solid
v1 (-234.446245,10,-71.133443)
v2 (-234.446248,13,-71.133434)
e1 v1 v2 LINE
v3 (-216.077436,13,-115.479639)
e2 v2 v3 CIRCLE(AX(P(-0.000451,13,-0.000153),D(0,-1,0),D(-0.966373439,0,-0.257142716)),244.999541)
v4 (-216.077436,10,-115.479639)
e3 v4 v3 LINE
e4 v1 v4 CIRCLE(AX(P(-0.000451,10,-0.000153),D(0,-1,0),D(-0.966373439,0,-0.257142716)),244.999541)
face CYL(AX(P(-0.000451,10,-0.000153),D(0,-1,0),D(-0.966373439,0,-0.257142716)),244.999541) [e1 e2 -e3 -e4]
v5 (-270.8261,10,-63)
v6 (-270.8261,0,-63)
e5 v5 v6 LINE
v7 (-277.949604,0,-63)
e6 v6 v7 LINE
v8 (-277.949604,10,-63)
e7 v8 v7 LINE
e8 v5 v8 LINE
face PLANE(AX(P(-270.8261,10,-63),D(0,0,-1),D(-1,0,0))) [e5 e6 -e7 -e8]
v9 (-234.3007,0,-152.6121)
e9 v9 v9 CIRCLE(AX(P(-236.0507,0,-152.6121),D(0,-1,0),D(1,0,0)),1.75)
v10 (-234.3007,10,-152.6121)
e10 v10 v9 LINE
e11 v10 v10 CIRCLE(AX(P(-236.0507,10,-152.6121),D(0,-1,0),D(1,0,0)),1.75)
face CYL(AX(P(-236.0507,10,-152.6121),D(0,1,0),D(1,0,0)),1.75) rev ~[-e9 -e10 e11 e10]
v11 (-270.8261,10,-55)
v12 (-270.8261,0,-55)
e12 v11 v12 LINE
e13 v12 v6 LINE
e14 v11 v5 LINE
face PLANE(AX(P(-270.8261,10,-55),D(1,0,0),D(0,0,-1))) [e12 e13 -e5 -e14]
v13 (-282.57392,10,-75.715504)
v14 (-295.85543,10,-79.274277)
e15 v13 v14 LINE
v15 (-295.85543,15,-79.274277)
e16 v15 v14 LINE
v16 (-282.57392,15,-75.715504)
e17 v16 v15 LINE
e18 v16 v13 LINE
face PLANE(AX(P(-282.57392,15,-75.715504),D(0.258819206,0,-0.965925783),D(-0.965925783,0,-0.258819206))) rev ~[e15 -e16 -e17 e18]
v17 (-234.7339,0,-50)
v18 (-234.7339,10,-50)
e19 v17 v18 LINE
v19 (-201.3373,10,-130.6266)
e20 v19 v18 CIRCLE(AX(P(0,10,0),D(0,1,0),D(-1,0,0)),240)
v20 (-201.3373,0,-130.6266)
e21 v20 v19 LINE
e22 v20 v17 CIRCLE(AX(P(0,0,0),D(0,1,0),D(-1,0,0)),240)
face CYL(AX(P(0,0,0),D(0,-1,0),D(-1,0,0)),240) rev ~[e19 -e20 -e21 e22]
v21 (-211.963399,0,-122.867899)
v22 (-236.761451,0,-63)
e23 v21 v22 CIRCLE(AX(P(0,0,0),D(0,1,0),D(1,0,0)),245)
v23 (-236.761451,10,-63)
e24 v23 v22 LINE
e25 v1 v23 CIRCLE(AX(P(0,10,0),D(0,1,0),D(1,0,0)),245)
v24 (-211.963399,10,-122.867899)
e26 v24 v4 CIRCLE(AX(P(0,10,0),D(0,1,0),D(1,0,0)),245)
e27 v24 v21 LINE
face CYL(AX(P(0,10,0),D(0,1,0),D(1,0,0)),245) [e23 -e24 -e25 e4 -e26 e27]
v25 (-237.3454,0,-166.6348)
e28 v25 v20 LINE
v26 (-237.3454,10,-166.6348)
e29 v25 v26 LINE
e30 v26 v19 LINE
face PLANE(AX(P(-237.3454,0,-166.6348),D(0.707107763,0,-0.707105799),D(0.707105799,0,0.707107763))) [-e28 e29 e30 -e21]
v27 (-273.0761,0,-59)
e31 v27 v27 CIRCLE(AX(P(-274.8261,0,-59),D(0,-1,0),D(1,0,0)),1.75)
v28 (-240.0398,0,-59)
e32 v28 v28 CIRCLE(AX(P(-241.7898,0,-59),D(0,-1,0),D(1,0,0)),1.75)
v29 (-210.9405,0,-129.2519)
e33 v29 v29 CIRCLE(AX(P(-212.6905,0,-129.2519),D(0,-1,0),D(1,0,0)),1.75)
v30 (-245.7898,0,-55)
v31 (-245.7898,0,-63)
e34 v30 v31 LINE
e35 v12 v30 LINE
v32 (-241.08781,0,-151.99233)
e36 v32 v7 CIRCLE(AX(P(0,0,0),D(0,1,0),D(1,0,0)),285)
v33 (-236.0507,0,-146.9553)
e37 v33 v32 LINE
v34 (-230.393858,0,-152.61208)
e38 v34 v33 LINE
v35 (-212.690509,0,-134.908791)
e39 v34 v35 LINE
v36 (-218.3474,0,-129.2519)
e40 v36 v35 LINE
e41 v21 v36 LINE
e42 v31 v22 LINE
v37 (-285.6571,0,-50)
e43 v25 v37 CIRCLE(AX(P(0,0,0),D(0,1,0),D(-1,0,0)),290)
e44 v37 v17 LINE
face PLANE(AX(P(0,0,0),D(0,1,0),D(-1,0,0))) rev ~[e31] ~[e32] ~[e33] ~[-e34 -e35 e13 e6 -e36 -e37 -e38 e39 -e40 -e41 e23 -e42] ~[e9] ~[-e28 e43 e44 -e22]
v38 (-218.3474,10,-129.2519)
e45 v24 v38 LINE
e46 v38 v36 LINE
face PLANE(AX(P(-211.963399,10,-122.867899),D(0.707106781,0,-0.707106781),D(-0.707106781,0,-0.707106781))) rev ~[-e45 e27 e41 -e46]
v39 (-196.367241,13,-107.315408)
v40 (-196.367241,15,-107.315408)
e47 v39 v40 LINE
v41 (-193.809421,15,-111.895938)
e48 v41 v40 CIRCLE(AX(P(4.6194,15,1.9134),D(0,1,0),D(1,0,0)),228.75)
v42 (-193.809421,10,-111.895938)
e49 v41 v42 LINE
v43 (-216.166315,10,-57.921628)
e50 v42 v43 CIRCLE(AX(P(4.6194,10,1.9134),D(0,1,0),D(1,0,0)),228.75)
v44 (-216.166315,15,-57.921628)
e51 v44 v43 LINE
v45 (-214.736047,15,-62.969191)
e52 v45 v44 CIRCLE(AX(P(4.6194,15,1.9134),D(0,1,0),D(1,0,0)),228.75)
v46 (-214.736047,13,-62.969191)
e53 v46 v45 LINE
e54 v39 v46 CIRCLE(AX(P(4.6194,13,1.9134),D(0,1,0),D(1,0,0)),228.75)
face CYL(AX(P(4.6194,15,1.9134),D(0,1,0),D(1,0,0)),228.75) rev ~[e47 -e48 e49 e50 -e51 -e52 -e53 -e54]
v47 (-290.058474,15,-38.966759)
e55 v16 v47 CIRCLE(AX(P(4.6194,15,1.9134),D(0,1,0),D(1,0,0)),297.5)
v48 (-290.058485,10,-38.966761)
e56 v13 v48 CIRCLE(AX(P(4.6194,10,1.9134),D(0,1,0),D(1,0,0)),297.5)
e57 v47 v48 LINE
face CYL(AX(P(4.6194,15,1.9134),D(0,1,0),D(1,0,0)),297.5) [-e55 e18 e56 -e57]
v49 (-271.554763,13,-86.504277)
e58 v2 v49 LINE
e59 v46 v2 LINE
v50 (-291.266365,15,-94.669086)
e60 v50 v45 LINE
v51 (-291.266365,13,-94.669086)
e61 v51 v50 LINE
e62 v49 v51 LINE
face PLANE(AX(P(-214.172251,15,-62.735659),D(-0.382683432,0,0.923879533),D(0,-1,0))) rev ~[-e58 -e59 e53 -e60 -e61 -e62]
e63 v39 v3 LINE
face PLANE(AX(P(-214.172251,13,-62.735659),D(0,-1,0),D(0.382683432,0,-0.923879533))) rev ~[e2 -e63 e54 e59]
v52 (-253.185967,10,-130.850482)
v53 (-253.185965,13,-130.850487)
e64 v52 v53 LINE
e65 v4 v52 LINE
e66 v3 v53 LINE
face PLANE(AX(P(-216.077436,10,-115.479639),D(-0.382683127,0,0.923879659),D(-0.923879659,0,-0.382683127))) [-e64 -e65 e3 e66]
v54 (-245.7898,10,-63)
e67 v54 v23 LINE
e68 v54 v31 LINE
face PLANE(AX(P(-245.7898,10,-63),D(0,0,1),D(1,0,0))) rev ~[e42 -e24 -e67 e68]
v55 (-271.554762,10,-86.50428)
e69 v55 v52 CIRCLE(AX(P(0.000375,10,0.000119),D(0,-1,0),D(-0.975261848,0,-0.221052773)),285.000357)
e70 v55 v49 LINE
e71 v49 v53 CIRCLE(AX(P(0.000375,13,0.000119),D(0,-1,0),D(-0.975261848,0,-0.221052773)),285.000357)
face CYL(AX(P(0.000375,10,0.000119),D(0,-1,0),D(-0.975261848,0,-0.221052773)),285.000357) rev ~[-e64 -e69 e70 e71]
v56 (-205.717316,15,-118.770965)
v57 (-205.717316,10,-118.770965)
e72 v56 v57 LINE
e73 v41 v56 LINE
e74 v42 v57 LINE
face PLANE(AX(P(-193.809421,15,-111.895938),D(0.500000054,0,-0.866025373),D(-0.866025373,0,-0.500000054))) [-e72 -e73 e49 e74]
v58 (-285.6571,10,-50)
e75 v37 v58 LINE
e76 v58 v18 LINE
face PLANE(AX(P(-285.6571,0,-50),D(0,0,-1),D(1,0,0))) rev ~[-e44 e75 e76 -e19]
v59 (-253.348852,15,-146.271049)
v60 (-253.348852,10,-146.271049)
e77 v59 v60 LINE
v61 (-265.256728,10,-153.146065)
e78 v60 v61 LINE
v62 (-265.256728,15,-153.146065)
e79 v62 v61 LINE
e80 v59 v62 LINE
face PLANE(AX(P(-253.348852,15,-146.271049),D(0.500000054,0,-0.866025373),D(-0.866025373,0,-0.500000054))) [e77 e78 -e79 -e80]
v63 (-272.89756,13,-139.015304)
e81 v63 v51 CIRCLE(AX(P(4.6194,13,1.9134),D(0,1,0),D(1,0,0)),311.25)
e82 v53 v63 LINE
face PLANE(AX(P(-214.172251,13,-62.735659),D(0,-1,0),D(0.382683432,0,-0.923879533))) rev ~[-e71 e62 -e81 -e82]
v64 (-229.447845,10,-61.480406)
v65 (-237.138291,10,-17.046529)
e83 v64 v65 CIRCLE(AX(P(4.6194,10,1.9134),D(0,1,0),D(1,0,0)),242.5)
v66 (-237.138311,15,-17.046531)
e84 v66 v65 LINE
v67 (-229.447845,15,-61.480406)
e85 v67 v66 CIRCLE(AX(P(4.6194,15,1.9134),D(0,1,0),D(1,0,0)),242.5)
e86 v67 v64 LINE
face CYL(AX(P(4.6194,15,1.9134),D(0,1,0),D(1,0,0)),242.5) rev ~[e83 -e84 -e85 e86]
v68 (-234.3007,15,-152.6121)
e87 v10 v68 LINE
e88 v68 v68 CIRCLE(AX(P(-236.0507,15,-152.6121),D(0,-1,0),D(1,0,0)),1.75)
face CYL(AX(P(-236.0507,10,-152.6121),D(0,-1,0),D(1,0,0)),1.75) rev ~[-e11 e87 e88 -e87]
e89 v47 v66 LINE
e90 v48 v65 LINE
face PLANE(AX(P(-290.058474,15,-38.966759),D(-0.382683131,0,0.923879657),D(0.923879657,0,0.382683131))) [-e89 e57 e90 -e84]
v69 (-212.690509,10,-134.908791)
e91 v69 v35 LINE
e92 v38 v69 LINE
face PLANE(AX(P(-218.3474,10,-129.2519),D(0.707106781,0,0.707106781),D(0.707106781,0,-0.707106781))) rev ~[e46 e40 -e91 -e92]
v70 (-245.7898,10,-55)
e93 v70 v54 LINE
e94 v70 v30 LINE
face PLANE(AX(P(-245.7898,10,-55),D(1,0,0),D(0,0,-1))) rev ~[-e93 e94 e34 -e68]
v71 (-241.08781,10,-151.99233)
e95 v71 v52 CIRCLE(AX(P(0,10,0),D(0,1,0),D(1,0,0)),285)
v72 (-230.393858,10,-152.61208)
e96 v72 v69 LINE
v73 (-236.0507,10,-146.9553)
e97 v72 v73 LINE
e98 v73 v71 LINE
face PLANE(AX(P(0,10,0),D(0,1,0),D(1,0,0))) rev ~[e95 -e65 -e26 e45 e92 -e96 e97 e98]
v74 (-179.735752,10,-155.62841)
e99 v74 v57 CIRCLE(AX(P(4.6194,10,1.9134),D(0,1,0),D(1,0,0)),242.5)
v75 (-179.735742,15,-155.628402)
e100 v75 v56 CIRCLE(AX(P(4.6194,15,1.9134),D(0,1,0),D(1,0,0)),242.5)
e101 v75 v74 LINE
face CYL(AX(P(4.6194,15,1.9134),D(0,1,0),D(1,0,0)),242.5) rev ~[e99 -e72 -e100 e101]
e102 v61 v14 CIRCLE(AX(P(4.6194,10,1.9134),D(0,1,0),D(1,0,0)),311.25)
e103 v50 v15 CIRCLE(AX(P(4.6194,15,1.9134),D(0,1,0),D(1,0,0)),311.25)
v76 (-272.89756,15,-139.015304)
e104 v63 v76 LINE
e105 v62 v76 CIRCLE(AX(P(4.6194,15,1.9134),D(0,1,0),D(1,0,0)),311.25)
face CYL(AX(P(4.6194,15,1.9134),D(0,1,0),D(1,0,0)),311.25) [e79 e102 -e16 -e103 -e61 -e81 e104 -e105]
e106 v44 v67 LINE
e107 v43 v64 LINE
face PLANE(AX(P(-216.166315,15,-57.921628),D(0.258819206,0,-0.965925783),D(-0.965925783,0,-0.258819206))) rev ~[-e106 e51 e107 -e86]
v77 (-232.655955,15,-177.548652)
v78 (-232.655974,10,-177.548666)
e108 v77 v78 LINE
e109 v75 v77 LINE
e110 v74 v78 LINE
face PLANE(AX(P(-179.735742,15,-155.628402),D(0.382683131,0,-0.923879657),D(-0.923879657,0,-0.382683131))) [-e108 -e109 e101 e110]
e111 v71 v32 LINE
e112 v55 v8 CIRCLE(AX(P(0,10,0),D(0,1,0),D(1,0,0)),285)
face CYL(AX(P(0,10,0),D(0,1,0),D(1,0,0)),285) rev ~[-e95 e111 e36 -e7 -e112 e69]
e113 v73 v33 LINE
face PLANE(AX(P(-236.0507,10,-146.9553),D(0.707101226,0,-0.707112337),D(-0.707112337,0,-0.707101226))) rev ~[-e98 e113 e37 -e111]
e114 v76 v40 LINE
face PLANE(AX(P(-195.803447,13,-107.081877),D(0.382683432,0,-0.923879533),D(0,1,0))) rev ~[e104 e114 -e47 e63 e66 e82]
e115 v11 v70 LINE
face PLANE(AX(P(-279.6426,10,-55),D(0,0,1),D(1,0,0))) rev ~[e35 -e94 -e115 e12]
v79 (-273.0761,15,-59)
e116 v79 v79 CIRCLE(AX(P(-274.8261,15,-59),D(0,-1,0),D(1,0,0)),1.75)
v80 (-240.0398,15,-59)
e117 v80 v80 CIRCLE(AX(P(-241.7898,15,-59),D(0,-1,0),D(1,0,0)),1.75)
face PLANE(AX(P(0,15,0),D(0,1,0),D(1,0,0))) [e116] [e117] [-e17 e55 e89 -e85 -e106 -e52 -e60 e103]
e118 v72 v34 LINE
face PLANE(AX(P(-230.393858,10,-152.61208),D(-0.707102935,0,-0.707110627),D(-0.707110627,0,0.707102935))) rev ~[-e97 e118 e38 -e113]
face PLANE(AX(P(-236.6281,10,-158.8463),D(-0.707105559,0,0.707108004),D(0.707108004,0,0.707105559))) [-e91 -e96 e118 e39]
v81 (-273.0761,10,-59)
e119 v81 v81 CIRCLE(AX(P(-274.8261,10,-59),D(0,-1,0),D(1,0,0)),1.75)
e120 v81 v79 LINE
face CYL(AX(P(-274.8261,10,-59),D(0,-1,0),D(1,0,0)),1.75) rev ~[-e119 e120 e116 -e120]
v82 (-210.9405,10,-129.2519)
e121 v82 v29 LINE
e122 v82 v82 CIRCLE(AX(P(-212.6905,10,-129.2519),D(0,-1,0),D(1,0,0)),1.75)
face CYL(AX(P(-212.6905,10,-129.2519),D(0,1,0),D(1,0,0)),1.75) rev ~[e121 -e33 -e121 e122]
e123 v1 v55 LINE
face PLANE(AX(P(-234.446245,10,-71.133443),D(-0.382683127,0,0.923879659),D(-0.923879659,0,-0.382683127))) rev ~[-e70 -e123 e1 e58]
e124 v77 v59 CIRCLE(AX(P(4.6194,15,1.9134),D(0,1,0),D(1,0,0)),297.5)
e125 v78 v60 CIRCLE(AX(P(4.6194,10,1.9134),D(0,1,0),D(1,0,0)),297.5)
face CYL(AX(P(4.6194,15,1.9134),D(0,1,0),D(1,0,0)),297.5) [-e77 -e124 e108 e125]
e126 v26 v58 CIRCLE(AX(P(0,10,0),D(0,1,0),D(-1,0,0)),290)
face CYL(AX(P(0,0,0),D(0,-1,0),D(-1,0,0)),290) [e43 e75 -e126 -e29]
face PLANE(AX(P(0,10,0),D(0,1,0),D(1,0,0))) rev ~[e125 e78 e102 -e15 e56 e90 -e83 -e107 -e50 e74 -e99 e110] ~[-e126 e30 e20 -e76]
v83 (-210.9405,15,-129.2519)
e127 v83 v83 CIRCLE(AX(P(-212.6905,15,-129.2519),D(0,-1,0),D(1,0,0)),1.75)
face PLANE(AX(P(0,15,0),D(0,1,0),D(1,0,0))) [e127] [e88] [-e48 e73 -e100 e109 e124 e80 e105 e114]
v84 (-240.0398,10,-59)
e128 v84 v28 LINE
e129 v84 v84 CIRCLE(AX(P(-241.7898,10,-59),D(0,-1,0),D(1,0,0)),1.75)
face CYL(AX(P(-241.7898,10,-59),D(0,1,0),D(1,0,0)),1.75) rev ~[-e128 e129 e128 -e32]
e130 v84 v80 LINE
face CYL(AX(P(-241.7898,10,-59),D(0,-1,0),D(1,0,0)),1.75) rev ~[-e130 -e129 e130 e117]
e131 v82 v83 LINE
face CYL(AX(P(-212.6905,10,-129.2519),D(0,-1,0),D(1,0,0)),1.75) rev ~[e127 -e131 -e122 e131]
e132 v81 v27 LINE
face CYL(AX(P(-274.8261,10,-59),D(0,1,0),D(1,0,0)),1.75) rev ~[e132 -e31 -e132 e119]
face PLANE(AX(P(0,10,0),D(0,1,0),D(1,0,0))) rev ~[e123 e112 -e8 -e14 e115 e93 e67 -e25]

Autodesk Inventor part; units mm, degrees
ref_plane "YZ Plane" through (0, 0, 0) normal (1, 0, 0) x (0, 1, 0)
sketch "Sketch1" plane through (0, 0, 0) normal (0, 1, 0) x (-1, 0, 0)
  circle A0 centre (0, 0) radius 217.5
  circle A1 centre (0, 0) radius 312.5
  line L0 (0, 0) -> (220.9709, -220.9709)
  line L1 (0, 0) -> (312.5, 0) construction
  line L2 (312.1398, -15) -> (216.9821, -15)
  line L3 (231.3228, -210.1096) -> (164.0361, -142.8229)
  circle A2 centre (0, 0) radius 240
  circle A3 centre (0, 0) radius 290
  line L4 (285.6571, -50) -> (234.7339, -50)
  line L5 (237.3454, -166.6348) -> (201.3373, -130.6266)
  dimension "d0" = 435
  dimension "d1" = 625
  dimension "d2" = 45
  dimension "d3" = 15
  dimension "d4" = 15
  dimension "d5" = 22.5
  dimension "d6" = 22.5
  dimension "d7" = 35
  dimension "d8" = 35
extrude "Extrusion1" add sketch "Sketch1" along normal blind 10 contours A2 L4 A3 L5
sketch "Sketch2" plane through (0, 10, 0) normal (0, 1, 0) x (1, 0, 0)
  arc A0 (-237.3454, 166.6348) -> (-285.6571, 50) centre (0, 0) ccw projected
  line L0 (-285.6571, 50) -> (-234.7339, 50) projected
  arc A1 (-201.3373, 130.6266) -> (-234.7339, 50) centre (0, 0) ccw projected
  line L1 (-201.3373, 130.6266) -> (-237.3454, 166.6348) projected
  circle A2 centre (0, 0) radius 245
  circle A3 centre (0, 0) radius 285
  line L2 (-279.6426, 55) -> (-238.7467, 55)
  line L3 (-236.6281, 158.8463) -> (-207.7103, 129.9286)
  line L4 (-239.8437, 50) -> (-280.5798, 50)
  line L5 (-204.9504, 134.2398) -> (-233.7552, 163.0445)
  dimension "d11" = 5
  dimension "d12" = 5
  dimension "d13" = 5
  dimension "d14" = 5
extrude "Extrusion2" cut sketch "Sketch2" against normal up to surface (10 mm away) contours L3 A2 L2 A3
sketch "Sketch3" plane through (0, 10, 0) normal (0, 1, 0) x (1, 0, 0)
  arc A0 (-236.6281, 158.8463) -> (-279.6426, 55) centre (0, 0) ccw projected
  line L0 (-236.6281, 158.8463) -> (-207.7103, 129.9286) projected
  arc A1 (-207.7103, 129.9286) -> (-238.7467, 55) centre (0, 0) ccw projected
  line L1 (-238.7467, 55) -> (-279.6426, 55) projected
  arc A2 (-237.3454, 166.6348) -> (-285.6571, 50) centre (0, 0) ccw projected
  line L2 (-285.6571, 50) -> (-234.7339, 50) projected
  arc A3 (-201.3373, 130.6266) -> (-234.7339, 50) centre (0, 0) ccw projected
  line L3 (-201.3373, 130.6266) -> (-237.3454, 166.6348) projected
  circle A4 centre (0, 0) radius 217.5
  circle A5 centre (0, 0) radius 312.5
  line L4 (0, 0) -> (100, 0) construction
  line L5 (0, 0) -> (-220.9709, 220.9709)
  line L6 (0, 0) -> (312.5, 0) construction
  line L7 (-312.1398, 15) -> (-216.9821, 15)
  line L8 (-164.0361, 142.8229) -> (-231.3228, 210.1096)
  line L9 (-437.5, 0) -> (437.5, 0) projected
  dimension "d17" = 435
  dimension "d18" = 625
  dimension "d21" = 135
  dimension "d22" = 15
  dimension "d23" = 15
extrude "Extrusion3" add sketch "Sketch3" along normal blind 5 contours L0 A1 L1 A0 | L3 A3 L2 A2 | A4 L7 A5 L8
sketch "Sketch4" plane through (0, 15, 0) normal (0, 1, 0) x (1, 0, 0)
  arc A0 (-231.3228, 210.1096) -> (-312.1398, 15) centre (0, 0) ccw projected
  line L0 (-312.1398, 15) -> (-216.9821, 15) projected
  arc A1 (-164.0361, 142.8229) -> (-216.9821, 15) centre (0, 0) ccw projected
  line L1 (-164.0361, 142.8229) -> (-231.3228, 210.1096) projected
  circle A2 centre (0, 0) radius 217.5
  circle A3 centre (0, 0) radius 312.5
  line L2 (0, 0) -> (4.6194, -1.9134) construction
  line L3 (0, 0) -> (5, 0) construction
  circle A4 centre (4.6194, -1.9134) radius 242.5
  circle A5 centre (4.6194, -1.9134) radius 297.5
  line L4 (0, 0) -> (-288.7124, 119.5886) construction
  line L5 (0, 0) -> (-270.6329, 156.25)
  line L6 (0, 0) -> (-301.8518, 80.881)
  circle A6 centre (4.6194, -1.9134) radius 228.75
  circle A7 centre (4.6194, -1.9134) radius 311.25
  point P0 (-253.3489, 146.271)
  point P1 (-217.3642, 196.151)
  point P2 (-282.5739, 75.7155)
  point P3 (-292.3994, 15)
  point P4 (-205.7173, 118.7709)
  point P5 (-188.3605, 108.75)
  point P6 (-178.396, 157.1828)
  point P7 (-210.0889, 56.2931)
  point P8 (-229.4479, 61.4804)
  point P9 (-237.2901, 15)
  point P10 (-295.8554, 79.2742)
  point P11 (-265.2567, 153.146)
  point P12 (-193.8094, 111.8959)
  point P13 (-216.1663, 57.9216)
  dimension "d26" = 625
  dimension "d27" = 435
  dimension "d28" = 5
  dimension "d29" = 22.5
  dimension "d30" = 485
  dimension "d31" = 595
  dimension "d33" = 15
  dimension "d36" = 457.5
  dimension "d37" = 622.5
extrude "Extrusion4" cut sketch "Sketch4" against normal blind 10 contours L1 A7 L5 A0 | L5 A7 L6 A0 | L1 A5 L5 A7 | L6 A7 L0 A0 | L6 A5 L0 A7 | L1 A6 L5 A4 | L1 A1 L5 A6 | L6 A6 L0 A4 | L5 A1 L6 A6 | L6 A1 L0 A6
sketch "Sketch5" plane through (0, 15, 0) normal (0, 1, 0) x (1, 0, 0)
  arc A0 (-282.5739, 75.7155) -> (-292.3994, 15) centre (4.6194, -1.9134) ccw projected
  line L0 (-292.3994, 15) -> (-237.2901, 15) projected
  arc A1 (-229.4479, 61.4804) -> (-237.2901, 15) centre (4.6194, -1.9134) ccw projected
  line L1 (-229.4479, 61.4804) -> (-216.1663, 57.9216) projected
  arc A2 (-193.8094, 111.8959) -> (-216.1663, 57.9216) centre (4.6194, -1.9134) ccw projected
  line L2 (-193.8094, 111.8959) -> (-205.7173, 118.7709) projected
  arc A3 (-178.396, 157.1828) -> (-205.7173, 118.7709) centre (4.6194, -1.9134) ccw projected
  line L3 (-178.396, 157.1828) -> (-217.3642, 196.151) projected
  arc A4 (-217.3642, 196.151) -> (-253.3489, 146.271) centre (4.6194, -1.9134) ccw projected
  line L4 (-253.3489, 146.271) -> (-265.2567, 153.146) projected
  arc A5 (-265.2567, 153.146) -> (-295.8554, 79.2742) centre (4.6194, -1.9134) ccw projected
  line L5 (-295.8554, 79.2742) -> (-282.5739, 75.7155) projected
  arc A6 (-157.7572, 146.5246) -> (-215.1597, 7.9427) centre (4.6194, -1.9134) ccw
  arc A7 (-254.0861, 186.4253) -> (-311.4886, 47.8434) centre (4.6194, -1.9134) ccw
  line L6 (-311.4886, 47.8434) -> (-215.1597, 7.9427)
  line L7 (-157.7572, 146.5246) -> (-254.0861, 186.4253)
  line L8 (-291.0221, 120.5453) -> (-198.6341, 82.2769) construction
  line L9 (-282.9381, 117.1968) -> (-206.718, 85.6254) construction
  point P0 (0, 0)
  point P1 (-244.8281, 101.4111)
  point P2 (-244.8281, 101.4111)
  point P3 (-232.656, 177.5487)
  point P4 (-179.7358, 155.6284)
  point P5 (-237.1383, 17.0465)
  point P6 (-290.0585, 38.9667)
  dimension "d38" = 150
  dimension "d39" = 104.2656
extrude "Extrusion5" cut sketch "Sketch5" against normal blind 10 contours L6 A1 L0 A0 | A4 L3 A3 L7
ref_plane "Work Plane2" through (-220.8757, 0, -44.2597) normal (-0.9238795, 0, -0.3826834) x (0, 1, 0)
ref_plane "Work Plane1" through (-234.7339, 0, -50) normal (-0.9238795, 0, -0.3826834) x (0, 1, 0)
sketch "Sketch7" plane through (0, 10, 0) normal (0, -1, 0) x (1, 0, 0)
  arc A0 (-279.6426, -55) -> (-236.6281, -158.8463) centre (0, 0) ccw projected
  line L0 (-236.6281, -158.8463) -> (-207.7103, -129.9286) projected
  arc A1 (-238.7467, -55) -> (-207.7103, -129.9286) centre (0, 0) ccw projected
  arc A2 (-238.7467, -55) -> (-207.7103, -129.9286) centre (0, 0) ccw projected
  line L1 (-238.7467, -55) -> (-279.6426, -55) projected
  arc A3 (-279.6426, -55) -> (-236.6281, -158.8463) centre (0, 0) ccw projected
  arc A4 (-291.5761, -93.715) -> (-272.4419, -139.9089) centre (4.6194, 1.9134) ccw projected
  line L2 (-195.885, -108.198) -> (-272.4419, -139.9089) projected
  arc A5 (-215.0192, -62.0041) -> (-195.885, -108.198) centre (4.6194, 1.9134) ccw projected
  line L3 (-215.0192, -62.0041) -> (-291.5761, -93.715) projected
  arc A6 (-279.6426, -55) -> (-236.6281, -158.8463) centre (0, 0) ccw projected
  line L4 (-279.6426, -55) -> (-238.7467, -55) projected
  arc A7 (-238.7467, -55) -> (-207.7103, -129.9286) centre (0, 0) ccw projected
  line L5 (-207.7103, -129.9286) -> (-236.6281, -158.8463) projected
  arc A8 (-285.6571, -50) -> (-237.3454, -166.6348) centre (0, 0) ccw projected
  line L6 (-201.3373, -130.6266) -> (-237.3454, -166.6348) projected
  arc A9 (-234.7339, -50) -> (-201.3373, -130.6266) centre (0, 0) ccw projected
  line L7 (-285.6571, -50) -> (-234.7339, -50) projected
  line L8 (-233.2223, -155.4405) -> (-236.0507, -152.6121) construction
  line L9 (-236.0507, -152.6121) -> (-238.8791, -155.4405) construction
  line L10 (-209.8621, -132.0804) -> (-212.6905, -129.2519) construction
  line L11 (-212.6905, -129.2519) -> (-209.8621, -126.4235) construction
  circle A10 centre (-212.6905, -129.2519) radius 1.75
  circle A11 centre (-236.0507, -152.6121) radius 1.75
  line L12 (-274.8261, -55) -> (-274.8261, -59) construction
  line L13 (-274.8261, -59) -> (-278.8261, -59) construction
  line L14 (-241.7898, -55) -> (-241.7898, -59) construction
  line L15 (-241.7898, -59) -> (-237.7898, -59) construction
  circle A12 centre (-241.7898, -59) radius 1.75
  circle A13 centre (-274.8261, -59) radius 1.75
  line L16 (-233.2223, -162.5116) -> (-226.8583, -156.1476)
  line L17 (-226.8583, -156.1476) -> (-236.0507, -146.9553)
  line L18 (-236.0507, -146.9553) -> (-242.4147, -153.3192)
  line L19 (-242.4147, -153.3192) -> (-233.2223, -162.5116)
  line L20 (-209.155, -138.4443) -> (-201.3373, -130.6266)
  line L21 (-201.3373, -130.6266) -> (-210.5297, -121.4342)
  line L22 (-210.5297, -121.4342) -> (-218.3474, -129.2519)
  line L23 (-218.3474, -129.2519) -> (-209.155, -138.4443)
  line L24 (-285.6571, -50) -> (-270.8261, -50)
  line L25 (-270.8261, -50) -> (-270.8261, -63)
  line L26 (-270.8261, -63) -> (-285.6571, -63)
  line L27 (-285.6571, -63) -> (-285.6571, -50)
  line L28 (-234.7339, -50) -> (-245.7898, -50)
  line L29 (-245.7898, -50) -> (-245.7898, -63)
  line L30 (-245.7898, -63) -> (-234.7339, -63)
  line L31 (-234.7339, -63) -> (-234.7339, -50)
  line L32 (-236.6281, -158.8463) -> (-207.7103, -129.9286) projected
  line L33 (-238.7467, -55) -> (-279.6426, -55) projected
  arc A14 (-279.6426, -55) -> (-236.6281, -158.8463) centre (0, 0) ccw projected
  line L34 (-236.6281, -158.8463) -> (-207.7103, -129.9286) projected
  arc A15 (-238.7467, -55) -> (-207.7103, -129.9286) centre (0, 0) ccw projected
  line L35 (-238.7467, -55) -> (-279.6426, -55) projected
  point P0 (-214.4385, -125.3431)
  point P1 (-277.9496, -63)
  point P2 (-270.8261, -55)
  point P3 (-236.7615, -63)
  point P4 (-245.7898, -55)
  point P5 (-212.6905, -134.9088)
  point P6 (-211.9634, -122.8679)
  point P7 (-241.0878, -151.9923)
  point P8 (-230.3939, -152.6121)
  dimension "d51" = 4
  dimension "d52" = 4
  dimension "d54" = 4
  dimension "d55" = 4
  dimension "d56" = 3.5
  dimension "d57" = 3.5
  dimension "d58" = 4
  dimension "d59" = 4
  dimension "d60" = 4
  dimension "d61" = 4
  dimension "d62" = 3.5
  dimension "d63" = 3.5
  dimension "d64" = 4
  dimension "d65" = 4
  dimension "d66" = 5
  dimension "d71" = 4
  dimension "d72" = 4
  dimension "d73" = 4
  dimension "d74" = 4
  dimension "d75" = 4
  dimension "d76" = 4
extrude "Extrusion7" add sketch "Sketch7" along normal blind 10 contours L1 L25 L26 A0 | L1 A1 L30 L29 | L18 L17 L0 A0 | A1 L0 L23 L22
extrude "Extrusion8" cut sketch "Sketch7" against normal up to next contours A10 | A11 | A12 | A13
ref_plane "Work Plane4" through (-216.1663, 15, -57.9216) normal (0.9238795, 0, 0.3826834) x (0, -1, 0)
sketch "Sketch9" plane through (-216.1663, 15, -57.9216) normal (0.9238795, 0, 0.3826834) x (0, -1, 0)
  line L0 (5, 58.4214) -> (5, 0) projected
  line L1 (0, 58.4214) -> (5, 58.4214) projected
  line L2 (0, 0) -> (0, 58.4214) projected
  line L3 (0, 0) -> (5, 0) projected
  line L4 (15, -14.4241) -> (15, 72.8455) projected
  line L5 (15, 72.8455) -> (5, 72.8455) projected
  line L6 (5, -14.4241) -> (5, 72.8455) projected
  line L7 (15, -14.4241) -> (5, -14.4241) projected
  line L8 (-2, 5.2107) -> (2, 5.2107)
  line L9 (2, 5.2107) -> (2, 53.2107)
  line L10 (2, 53.2107) -> (-2, 53.2107)
  line L11 (-2, 53.2107) -> (-2, 5.2107)
  line L12 (-2, 5.2107) -> (2, 53.2107) construction
  line L13 (2, 5.2107) -> (-2, 53.2107) construction
  point P0 (15, 29.2107)
  point P1 (0, 29.2107)
  dimension "d85" = 4
  dimension "d86" = 48
extrude "Extrusion10" cut sketch "Sketch9" against normal up to next contours L10 L9 L8 L2 | L2 L8 L11 L10
sketch "Sketch10" plane through (0, 10, 0) normal (0, -1, 0) x (1, 0, 0)
  arc A0 (-291.2664, -94.6691) -> (-272.8976, -139.0153) centre (4.6194, 1.9134) ccw projected
  line L0 (-214.736, -62.9692) -> (-291.2664, -94.6691) projected
  arc A1 (-214.736, -62.9692) -> (-196.3672, -107.3154) centre (4.6194, 1.9134) ccw projected
  line L1 (-196.3672, -107.3154) -> (-272.8976, -139.0153) projected
  line L2 (-245.7898, -63) -> (-245.7898, -55) projected
  line L3 (-245.7898, -55) -> (-270.8261, -55) projected
  line L4 (-270.8261, -55) -> (-270.8261, -63) projected
  line L5 (-270.8261, -63) -> (-277.9496, -63) projected
  arc A2 (-277.9496, -63) -> (-241.0878, -151.9923) centre (0, 0) ccw projected
  line L6 (-241.0878, -151.9923) -> (-236.0507, -146.9553) projected
  line L7 (-236.0507, -146.9553) -> (-230.3939, -152.6121) projected
  line L8 (-230.3939, -152.6121) -> (-212.6905, -134.9088) projected
  line L9 (-212.6905, -134.9088) -> (-218.3474, -129.2519) projected
  line L10 (-218.3474, -129.2519) -> (-211.9634, -122.8679) projected
  arc A3 (-236.7615, -63) -> (-211.9634, -122.8679) centre (0, 0) ccw projected
  line L11 (-236.7615, -63) -> (-245.7898, -63) projected
  point P0 (-216.0774, -115.4796)
  point P1 (-234.4462, -71.1334)
  point P2 (-271.5548, -86.5043)
  point P3 (-253.186, -130.8505)
extrude "Extrusion11" cut sketch "Sketch10" against normal blind 10 contours L0 A3 L1 A2
properties part number "Battery Module Third Iteration Top wING" material "PLA Plastic"
